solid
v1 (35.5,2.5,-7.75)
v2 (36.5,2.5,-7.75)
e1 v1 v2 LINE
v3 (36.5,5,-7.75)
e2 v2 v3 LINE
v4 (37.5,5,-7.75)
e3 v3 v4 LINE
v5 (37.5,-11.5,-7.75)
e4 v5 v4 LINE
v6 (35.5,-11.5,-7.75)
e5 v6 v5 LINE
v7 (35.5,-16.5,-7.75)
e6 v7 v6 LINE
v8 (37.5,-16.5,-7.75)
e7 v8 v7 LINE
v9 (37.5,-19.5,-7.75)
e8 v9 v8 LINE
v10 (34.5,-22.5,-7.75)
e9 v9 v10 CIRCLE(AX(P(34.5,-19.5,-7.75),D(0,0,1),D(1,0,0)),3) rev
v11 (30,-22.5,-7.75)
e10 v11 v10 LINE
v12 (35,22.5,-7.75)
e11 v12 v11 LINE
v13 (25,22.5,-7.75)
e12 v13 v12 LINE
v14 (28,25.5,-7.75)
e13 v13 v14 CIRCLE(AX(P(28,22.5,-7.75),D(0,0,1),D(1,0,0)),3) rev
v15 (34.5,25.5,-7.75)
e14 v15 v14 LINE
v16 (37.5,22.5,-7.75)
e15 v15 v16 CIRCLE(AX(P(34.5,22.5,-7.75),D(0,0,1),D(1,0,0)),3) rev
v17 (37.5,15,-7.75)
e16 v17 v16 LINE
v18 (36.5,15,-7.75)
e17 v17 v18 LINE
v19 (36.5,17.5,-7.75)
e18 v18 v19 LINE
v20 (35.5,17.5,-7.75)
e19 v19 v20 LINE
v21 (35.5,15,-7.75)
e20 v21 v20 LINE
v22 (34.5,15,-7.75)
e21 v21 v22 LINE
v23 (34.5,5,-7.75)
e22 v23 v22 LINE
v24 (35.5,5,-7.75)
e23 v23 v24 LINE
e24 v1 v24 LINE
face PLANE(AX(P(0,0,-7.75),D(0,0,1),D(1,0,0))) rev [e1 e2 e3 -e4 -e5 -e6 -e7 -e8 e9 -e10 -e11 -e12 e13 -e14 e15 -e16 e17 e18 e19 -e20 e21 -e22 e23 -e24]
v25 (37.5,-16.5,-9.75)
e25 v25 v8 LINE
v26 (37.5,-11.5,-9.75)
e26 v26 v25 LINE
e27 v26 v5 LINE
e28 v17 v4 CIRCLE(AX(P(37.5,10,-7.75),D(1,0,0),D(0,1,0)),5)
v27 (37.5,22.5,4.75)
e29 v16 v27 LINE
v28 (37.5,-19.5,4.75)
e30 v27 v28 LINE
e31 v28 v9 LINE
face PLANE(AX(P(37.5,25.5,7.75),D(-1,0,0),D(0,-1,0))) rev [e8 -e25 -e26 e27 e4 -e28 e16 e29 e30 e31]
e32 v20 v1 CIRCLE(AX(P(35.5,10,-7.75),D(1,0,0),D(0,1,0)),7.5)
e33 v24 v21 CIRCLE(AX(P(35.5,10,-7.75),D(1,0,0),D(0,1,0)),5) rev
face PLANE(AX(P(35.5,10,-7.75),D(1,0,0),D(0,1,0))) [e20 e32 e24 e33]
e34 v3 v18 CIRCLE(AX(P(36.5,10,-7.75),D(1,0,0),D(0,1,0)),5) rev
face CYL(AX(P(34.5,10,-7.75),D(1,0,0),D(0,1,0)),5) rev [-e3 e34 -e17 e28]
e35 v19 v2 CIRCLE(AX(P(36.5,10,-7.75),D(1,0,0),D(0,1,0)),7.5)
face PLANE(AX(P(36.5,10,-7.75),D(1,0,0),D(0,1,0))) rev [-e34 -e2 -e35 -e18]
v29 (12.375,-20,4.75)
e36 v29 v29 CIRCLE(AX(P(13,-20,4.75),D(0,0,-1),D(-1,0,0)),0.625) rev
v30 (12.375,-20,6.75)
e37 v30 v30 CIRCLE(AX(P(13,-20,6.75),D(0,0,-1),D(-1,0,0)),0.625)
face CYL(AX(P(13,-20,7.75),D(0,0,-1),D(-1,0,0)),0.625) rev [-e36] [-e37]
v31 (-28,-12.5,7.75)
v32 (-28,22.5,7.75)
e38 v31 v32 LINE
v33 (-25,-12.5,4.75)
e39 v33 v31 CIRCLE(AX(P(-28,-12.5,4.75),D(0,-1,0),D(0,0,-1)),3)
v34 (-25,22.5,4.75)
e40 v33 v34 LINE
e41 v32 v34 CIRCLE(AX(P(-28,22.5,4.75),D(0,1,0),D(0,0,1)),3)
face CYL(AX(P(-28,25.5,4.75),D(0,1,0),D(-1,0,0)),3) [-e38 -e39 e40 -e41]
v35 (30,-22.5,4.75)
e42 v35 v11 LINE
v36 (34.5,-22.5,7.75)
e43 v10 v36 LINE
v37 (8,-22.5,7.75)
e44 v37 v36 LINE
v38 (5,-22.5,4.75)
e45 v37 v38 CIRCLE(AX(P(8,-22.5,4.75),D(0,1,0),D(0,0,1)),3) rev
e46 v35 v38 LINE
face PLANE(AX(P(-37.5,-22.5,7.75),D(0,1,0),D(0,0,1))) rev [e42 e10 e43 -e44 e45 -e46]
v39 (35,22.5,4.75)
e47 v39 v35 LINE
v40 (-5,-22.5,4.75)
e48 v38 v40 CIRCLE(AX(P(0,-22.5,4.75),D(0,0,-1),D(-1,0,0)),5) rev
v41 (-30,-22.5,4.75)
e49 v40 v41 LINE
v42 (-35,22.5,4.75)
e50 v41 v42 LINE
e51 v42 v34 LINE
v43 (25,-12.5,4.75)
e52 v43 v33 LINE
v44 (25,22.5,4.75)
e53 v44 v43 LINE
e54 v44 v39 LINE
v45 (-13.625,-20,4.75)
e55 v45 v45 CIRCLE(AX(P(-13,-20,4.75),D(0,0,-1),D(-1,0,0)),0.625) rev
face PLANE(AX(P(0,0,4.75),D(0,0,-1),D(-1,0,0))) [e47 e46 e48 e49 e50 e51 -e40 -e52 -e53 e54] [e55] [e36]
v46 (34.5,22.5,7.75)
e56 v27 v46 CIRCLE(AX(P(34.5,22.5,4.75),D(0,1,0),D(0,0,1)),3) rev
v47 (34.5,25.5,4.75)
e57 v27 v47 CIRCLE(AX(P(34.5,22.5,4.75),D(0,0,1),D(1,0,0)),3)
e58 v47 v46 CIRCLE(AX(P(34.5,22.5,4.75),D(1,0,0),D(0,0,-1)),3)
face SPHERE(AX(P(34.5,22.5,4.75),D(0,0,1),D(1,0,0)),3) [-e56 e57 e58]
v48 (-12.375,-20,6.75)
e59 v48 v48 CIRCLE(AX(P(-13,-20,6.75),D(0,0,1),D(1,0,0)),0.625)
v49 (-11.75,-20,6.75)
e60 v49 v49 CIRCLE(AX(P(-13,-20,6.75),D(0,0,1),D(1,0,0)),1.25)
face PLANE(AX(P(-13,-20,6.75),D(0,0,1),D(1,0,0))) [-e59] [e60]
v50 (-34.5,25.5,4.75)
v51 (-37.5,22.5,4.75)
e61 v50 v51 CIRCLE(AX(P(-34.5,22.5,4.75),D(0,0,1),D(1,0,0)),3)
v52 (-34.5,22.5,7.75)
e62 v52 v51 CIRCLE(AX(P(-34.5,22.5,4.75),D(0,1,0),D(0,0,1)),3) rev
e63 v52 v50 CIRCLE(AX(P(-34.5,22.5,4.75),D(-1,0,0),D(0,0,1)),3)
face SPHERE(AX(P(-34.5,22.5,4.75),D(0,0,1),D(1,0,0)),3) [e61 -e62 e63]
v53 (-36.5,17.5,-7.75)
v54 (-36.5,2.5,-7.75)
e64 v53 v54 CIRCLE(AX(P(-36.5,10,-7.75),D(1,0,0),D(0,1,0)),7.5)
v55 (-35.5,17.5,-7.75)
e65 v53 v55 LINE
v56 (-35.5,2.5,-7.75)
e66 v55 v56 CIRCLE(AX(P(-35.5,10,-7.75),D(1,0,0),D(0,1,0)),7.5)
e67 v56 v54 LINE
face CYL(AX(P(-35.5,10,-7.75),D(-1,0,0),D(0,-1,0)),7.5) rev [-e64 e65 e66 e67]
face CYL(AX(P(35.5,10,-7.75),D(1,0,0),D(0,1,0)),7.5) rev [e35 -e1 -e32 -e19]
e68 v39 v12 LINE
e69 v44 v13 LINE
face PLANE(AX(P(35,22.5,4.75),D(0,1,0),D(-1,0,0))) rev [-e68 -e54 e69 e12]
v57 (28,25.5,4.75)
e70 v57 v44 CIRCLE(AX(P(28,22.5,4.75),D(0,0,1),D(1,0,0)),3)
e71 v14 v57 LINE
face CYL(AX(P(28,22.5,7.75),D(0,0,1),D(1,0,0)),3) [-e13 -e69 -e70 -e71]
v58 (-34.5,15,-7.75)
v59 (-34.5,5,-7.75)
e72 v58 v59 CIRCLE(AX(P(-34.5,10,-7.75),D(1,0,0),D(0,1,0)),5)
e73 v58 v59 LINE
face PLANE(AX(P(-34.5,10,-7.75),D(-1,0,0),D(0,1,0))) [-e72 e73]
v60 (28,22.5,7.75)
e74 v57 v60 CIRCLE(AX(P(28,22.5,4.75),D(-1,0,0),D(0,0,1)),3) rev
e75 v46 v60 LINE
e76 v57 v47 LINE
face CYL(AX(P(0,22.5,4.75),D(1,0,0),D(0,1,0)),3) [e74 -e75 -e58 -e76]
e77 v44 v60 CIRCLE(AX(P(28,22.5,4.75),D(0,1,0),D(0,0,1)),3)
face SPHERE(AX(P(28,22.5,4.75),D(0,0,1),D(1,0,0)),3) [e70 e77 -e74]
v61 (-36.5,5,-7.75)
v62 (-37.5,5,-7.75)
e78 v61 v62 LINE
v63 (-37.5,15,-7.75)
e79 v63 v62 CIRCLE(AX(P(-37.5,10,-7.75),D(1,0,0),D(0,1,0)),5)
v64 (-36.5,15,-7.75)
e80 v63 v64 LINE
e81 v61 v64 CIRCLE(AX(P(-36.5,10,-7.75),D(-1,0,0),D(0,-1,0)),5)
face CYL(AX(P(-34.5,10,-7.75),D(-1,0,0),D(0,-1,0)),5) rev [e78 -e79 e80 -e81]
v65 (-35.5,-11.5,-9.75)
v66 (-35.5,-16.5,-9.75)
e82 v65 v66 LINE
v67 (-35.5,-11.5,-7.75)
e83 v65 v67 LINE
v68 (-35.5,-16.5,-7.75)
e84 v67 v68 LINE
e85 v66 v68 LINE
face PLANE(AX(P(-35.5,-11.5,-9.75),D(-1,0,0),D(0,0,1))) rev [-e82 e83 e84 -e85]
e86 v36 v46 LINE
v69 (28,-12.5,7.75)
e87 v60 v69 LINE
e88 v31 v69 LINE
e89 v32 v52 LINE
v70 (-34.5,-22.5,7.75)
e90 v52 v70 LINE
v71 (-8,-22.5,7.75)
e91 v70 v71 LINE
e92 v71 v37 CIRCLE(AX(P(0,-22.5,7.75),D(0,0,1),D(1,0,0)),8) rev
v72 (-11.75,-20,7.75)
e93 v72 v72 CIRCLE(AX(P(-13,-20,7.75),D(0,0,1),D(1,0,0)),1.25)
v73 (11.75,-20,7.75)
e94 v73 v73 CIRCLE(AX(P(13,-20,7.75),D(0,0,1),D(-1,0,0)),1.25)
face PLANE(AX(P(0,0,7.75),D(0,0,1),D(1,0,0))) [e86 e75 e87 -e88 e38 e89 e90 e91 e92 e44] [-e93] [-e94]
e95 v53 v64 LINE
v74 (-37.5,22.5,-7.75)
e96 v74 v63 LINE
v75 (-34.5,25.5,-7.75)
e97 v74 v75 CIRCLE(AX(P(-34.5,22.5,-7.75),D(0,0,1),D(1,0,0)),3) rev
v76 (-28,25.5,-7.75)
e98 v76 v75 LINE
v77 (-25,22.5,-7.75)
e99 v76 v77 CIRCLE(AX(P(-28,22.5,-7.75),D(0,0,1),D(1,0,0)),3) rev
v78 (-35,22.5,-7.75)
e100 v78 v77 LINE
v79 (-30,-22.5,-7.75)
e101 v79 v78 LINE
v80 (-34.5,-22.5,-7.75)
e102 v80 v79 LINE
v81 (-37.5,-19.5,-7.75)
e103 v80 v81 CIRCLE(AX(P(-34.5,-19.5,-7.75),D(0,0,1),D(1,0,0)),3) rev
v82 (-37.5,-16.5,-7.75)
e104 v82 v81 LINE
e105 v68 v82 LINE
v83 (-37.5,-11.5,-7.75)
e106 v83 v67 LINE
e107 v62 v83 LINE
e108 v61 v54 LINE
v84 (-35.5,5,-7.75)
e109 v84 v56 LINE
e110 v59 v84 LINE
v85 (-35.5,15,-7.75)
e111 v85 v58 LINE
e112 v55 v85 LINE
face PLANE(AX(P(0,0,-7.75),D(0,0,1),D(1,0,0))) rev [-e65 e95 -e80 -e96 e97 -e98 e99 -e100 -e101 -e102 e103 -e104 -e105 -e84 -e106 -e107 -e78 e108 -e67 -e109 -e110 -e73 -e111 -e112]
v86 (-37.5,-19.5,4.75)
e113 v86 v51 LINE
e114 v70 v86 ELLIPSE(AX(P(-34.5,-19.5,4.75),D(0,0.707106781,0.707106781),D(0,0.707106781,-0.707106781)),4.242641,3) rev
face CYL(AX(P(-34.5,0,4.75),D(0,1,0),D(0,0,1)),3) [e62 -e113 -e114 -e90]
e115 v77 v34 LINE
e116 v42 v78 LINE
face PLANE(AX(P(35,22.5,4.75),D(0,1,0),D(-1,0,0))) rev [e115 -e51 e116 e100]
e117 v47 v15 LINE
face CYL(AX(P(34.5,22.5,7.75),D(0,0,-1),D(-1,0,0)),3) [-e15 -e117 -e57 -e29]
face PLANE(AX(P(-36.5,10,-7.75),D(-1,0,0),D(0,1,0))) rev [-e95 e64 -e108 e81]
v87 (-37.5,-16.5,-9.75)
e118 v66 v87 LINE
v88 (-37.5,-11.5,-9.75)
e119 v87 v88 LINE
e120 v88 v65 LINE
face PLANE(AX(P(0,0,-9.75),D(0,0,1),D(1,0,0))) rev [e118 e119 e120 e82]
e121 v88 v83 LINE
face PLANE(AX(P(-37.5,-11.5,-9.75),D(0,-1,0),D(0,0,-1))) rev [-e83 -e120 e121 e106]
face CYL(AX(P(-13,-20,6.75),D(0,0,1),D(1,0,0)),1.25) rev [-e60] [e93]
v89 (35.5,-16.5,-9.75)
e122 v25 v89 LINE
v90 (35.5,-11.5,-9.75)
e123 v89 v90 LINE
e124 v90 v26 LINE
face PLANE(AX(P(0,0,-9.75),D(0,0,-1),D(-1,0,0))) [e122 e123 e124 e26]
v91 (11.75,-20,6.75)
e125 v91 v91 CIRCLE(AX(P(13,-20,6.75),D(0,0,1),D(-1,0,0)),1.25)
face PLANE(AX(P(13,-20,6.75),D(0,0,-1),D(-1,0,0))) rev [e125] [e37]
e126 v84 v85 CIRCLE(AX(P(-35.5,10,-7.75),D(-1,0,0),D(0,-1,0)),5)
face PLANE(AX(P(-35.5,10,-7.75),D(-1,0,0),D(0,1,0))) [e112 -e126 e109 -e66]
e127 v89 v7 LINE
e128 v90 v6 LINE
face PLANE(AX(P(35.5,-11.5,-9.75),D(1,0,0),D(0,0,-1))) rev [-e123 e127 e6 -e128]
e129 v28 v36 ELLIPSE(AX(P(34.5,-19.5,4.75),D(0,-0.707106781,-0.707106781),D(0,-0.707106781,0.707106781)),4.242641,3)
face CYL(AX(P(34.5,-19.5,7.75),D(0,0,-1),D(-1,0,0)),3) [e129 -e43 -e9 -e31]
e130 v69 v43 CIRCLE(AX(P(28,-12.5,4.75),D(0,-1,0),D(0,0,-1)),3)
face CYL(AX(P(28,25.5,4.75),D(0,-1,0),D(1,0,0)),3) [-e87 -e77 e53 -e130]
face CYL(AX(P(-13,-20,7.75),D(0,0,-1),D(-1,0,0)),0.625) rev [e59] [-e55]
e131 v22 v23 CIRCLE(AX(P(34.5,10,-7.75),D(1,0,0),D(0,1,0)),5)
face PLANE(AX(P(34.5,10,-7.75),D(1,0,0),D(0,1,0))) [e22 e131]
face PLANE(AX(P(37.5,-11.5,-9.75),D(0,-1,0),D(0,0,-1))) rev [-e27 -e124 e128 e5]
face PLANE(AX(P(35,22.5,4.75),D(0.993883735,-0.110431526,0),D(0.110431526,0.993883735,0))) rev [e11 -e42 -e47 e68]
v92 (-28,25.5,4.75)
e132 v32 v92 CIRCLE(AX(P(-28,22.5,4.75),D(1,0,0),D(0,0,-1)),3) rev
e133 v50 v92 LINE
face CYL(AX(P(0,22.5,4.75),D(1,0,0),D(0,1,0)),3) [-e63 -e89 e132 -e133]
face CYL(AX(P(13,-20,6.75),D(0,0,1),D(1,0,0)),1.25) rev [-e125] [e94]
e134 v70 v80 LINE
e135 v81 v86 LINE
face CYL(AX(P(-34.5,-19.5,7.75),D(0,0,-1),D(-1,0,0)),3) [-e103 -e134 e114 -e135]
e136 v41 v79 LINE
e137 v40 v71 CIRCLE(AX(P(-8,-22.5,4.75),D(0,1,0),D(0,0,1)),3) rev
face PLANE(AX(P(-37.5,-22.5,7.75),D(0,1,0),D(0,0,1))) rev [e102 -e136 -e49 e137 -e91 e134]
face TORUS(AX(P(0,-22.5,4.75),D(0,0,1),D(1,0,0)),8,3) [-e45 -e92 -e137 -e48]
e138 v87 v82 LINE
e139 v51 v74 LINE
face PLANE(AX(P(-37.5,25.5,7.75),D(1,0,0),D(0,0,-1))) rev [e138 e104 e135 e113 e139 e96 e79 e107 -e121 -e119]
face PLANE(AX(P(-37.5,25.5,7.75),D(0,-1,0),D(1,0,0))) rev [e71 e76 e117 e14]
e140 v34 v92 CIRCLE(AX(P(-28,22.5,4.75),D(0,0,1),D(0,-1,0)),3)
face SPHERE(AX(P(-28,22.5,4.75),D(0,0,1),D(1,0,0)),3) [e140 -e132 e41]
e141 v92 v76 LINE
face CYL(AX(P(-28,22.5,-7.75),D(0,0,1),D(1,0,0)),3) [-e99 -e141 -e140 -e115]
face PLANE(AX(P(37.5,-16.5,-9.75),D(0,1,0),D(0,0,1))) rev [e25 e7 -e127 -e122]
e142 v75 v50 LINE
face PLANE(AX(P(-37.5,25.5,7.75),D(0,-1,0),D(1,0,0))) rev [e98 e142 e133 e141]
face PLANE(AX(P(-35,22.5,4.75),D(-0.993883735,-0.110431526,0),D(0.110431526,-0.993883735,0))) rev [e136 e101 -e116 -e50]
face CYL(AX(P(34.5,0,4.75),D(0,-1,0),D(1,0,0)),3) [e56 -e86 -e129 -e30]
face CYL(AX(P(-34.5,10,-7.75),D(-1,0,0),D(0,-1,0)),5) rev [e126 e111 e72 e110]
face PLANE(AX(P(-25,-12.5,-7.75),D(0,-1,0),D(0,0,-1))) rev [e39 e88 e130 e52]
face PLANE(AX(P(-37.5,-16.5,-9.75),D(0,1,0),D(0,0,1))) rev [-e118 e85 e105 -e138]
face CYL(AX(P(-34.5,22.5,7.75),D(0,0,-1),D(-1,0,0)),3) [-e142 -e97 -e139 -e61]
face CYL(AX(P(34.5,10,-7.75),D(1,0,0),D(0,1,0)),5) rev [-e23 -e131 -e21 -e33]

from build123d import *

# Parameters (mm, degrees)
SKETCH2_W           = 75
SKETCH2_H           = 48
BOSS_EXTRUDE1_DEPTH = 7.75
CUT_EXTRUDE4_DEPTH  = 12.5
SKETCH12_W          = 50
SKETCH12_H          = 38
CUT_EXTRUDE5_DEPTH  = 7.75
SKETCH13_R          = 0.625
CUT_EXTRUDE6_DEPTH  = 47.006113724
FILLET4_R           = 3
SKETCH14_W          = 2
SKETCH14_H          = 5
BOSS_EXTRUDE2_DEPTH = 2
SKETCH16_R          = 1.25
CUT_EXTRUDE9_DEPTH  = 1
SKETCH18_R          = 5
CUT_EXTRUDE10_DEPTH = 3
SKETCH19_R          = 7.5
CUT_EXTRUDE11_DEPTH = 0.5


with BuildPart() as part:
    # Sketch2 → Boss-Extrude1 (new, symmetric)
    with BuildSketch(Plane.XY):
        with Locations((0, 1.5)):
            Rectangle(SKETCH2_W, SKETCH2_H)
    extrude(amount=BOSS_EXTRUDE1_DEPTH, both=True)

    # Sketch11 → Cut-Extrude4 (cut)
    with BuildSketch(Plane(origin=(0, 0, -7.75), x_dir=(-1, 0, 0), z_dir=(0, 0, -1))):
        Polygon((-35, 22.5), (35, 22.5), (30, -22.5), (-30, -22.5), align=None)
    extrude(amount=-CUT_EXTRUDE4_DEPTH, mode=Mode.SUBTRACT)

    # Sketch12 → Cut-Extrude5 (cut, symmetric)
    with BuildSketch(Plane.XY):
        with Locations((0, 6.5)):
            Rectangle(SKETCH12_W, SKETCH12_H)
    extrude(amount=CUT_EXTRUDE5_DEPTH, both=True, mode=Mode.SUBTRACT)

    # Sketch13 → Cut-Extrude6 (cut, through all)
    with BuildSketch(Plane.XY):
        with Locations(Location((13, -20, 0), (0, 0, 180))):
            Circle(SKETCH13_R)
        with Locations(Location((-13, -20, 0), (0, 0, 180))):
            Circle(SKETCH13_R)
        with BuildLine():
            Line((-5, -22.5), (5, -22.5))
            ThreePointArc((5, -22.5), (0, -17.5), (-5, -22.5))
        make_face()
    extrude(amount=CUT_EXTRUDE6_DEPTH, mode=Mode.SUBTRACT)

    # Fillet4
    fillet4_edges = [part.edges().sort_by_distance(p)[0] for p in [
        (0, -17.5, 7.75),
        (37.5, 1.5, 7.75),
        (25, 6.5, 7.75),
        (-25, 6.5, 7.75),
        (-37.5, 1.5, 7.75),
        (25, 25.5, 0),
        (-25, 25.5, 0),
        (-37.5, 25.5, 0),
        (37.5, 25.5, 0),
        (31.25, 25.5, 7.75),
        (-31.25, 25.5, 7.75),
        (-37.5, -22.5, 0),
        (37.5, -22.5, 0),
    ]]
    fillet(fillet4_edges, radius=FILLET4_R - 0.0001)  # a hair under: the kernel refuses the full size

    # Sketch14 → Boss-Extrude2 (add)
    with BuildSketch(Plane(origin=(0, 0, -7.75), x_dir=(-1, 0, 0), z_dir=(0, 0, -1))):
        with Locations((-36.5, -14)):
            Rectangle(SKETCH14_W, SKETCH14_H)
        with Locations((36.5, -14)):
            Rectangle(SKETCH14_W, SKETCH14_H)
    extrude(amount=BOSS_EXTRUDE2_DEPTH)

    # Sketch16 → Cut-Extrude9 (cut)
    with BuildSketch(Plane.XY.offset(7.75)):
        with Locations((-13, -20)):
            Circle(SKETCH16_R)
        with Locations(Location((13, -20, 0), (0, 0, 180))):
            Circle(SKETCH16_R)
    extrude(amount=-CUT_EXTRUDE9_DEPTH, mode=Mode.SUBTRACT)

    # Sketch18 → Cut-Extrude10 (cut)
    with BuildSketch(Plane(origin=(37.5, 0, 0), x_dir=(0, 0, -1), z_dir=(1, 0, 0))):
        with Locations((7.75, 10)):
            Circle(SKETCH18_R)
    cut_extrude10 = extrude(amount=-CUT_EXTRUDE10_DEPTH, mode=Mode.SUBTRACT)

    # Sketch19 → Cut-Extrude11 (cut, symmetric)
    with BuildSketch(Plane(origin=(36, 0, 0), x_dir=(0, 0, -1), z_dir=(1, 0, 0))):
        with Locations((7.75, 10)):
            Circle(SKETCH19_R)
    cut_extrude11 = extrude(amount=CUT_EXTRUDE11_DEPTH, both=True, mode=Mode.SUBTRACT)

    # Mirror1: Cut-Extrude10, Cut-Extrude11 across plane
    add(cut_extrude10.mirror(Plane(origin=(0, 0, 0), x_dir=(0, 0, 1), z_dir=(1, 0, 0))), mode=Mode.SUBTRACT)
    add(cut_extrude11.mirror(Plane(origin=(0, 0, 0), x_dir=(0, 0, 1), z_dir=(1, 0, 0))), mode=Mode.SUBTRACT)


solid = part.part
